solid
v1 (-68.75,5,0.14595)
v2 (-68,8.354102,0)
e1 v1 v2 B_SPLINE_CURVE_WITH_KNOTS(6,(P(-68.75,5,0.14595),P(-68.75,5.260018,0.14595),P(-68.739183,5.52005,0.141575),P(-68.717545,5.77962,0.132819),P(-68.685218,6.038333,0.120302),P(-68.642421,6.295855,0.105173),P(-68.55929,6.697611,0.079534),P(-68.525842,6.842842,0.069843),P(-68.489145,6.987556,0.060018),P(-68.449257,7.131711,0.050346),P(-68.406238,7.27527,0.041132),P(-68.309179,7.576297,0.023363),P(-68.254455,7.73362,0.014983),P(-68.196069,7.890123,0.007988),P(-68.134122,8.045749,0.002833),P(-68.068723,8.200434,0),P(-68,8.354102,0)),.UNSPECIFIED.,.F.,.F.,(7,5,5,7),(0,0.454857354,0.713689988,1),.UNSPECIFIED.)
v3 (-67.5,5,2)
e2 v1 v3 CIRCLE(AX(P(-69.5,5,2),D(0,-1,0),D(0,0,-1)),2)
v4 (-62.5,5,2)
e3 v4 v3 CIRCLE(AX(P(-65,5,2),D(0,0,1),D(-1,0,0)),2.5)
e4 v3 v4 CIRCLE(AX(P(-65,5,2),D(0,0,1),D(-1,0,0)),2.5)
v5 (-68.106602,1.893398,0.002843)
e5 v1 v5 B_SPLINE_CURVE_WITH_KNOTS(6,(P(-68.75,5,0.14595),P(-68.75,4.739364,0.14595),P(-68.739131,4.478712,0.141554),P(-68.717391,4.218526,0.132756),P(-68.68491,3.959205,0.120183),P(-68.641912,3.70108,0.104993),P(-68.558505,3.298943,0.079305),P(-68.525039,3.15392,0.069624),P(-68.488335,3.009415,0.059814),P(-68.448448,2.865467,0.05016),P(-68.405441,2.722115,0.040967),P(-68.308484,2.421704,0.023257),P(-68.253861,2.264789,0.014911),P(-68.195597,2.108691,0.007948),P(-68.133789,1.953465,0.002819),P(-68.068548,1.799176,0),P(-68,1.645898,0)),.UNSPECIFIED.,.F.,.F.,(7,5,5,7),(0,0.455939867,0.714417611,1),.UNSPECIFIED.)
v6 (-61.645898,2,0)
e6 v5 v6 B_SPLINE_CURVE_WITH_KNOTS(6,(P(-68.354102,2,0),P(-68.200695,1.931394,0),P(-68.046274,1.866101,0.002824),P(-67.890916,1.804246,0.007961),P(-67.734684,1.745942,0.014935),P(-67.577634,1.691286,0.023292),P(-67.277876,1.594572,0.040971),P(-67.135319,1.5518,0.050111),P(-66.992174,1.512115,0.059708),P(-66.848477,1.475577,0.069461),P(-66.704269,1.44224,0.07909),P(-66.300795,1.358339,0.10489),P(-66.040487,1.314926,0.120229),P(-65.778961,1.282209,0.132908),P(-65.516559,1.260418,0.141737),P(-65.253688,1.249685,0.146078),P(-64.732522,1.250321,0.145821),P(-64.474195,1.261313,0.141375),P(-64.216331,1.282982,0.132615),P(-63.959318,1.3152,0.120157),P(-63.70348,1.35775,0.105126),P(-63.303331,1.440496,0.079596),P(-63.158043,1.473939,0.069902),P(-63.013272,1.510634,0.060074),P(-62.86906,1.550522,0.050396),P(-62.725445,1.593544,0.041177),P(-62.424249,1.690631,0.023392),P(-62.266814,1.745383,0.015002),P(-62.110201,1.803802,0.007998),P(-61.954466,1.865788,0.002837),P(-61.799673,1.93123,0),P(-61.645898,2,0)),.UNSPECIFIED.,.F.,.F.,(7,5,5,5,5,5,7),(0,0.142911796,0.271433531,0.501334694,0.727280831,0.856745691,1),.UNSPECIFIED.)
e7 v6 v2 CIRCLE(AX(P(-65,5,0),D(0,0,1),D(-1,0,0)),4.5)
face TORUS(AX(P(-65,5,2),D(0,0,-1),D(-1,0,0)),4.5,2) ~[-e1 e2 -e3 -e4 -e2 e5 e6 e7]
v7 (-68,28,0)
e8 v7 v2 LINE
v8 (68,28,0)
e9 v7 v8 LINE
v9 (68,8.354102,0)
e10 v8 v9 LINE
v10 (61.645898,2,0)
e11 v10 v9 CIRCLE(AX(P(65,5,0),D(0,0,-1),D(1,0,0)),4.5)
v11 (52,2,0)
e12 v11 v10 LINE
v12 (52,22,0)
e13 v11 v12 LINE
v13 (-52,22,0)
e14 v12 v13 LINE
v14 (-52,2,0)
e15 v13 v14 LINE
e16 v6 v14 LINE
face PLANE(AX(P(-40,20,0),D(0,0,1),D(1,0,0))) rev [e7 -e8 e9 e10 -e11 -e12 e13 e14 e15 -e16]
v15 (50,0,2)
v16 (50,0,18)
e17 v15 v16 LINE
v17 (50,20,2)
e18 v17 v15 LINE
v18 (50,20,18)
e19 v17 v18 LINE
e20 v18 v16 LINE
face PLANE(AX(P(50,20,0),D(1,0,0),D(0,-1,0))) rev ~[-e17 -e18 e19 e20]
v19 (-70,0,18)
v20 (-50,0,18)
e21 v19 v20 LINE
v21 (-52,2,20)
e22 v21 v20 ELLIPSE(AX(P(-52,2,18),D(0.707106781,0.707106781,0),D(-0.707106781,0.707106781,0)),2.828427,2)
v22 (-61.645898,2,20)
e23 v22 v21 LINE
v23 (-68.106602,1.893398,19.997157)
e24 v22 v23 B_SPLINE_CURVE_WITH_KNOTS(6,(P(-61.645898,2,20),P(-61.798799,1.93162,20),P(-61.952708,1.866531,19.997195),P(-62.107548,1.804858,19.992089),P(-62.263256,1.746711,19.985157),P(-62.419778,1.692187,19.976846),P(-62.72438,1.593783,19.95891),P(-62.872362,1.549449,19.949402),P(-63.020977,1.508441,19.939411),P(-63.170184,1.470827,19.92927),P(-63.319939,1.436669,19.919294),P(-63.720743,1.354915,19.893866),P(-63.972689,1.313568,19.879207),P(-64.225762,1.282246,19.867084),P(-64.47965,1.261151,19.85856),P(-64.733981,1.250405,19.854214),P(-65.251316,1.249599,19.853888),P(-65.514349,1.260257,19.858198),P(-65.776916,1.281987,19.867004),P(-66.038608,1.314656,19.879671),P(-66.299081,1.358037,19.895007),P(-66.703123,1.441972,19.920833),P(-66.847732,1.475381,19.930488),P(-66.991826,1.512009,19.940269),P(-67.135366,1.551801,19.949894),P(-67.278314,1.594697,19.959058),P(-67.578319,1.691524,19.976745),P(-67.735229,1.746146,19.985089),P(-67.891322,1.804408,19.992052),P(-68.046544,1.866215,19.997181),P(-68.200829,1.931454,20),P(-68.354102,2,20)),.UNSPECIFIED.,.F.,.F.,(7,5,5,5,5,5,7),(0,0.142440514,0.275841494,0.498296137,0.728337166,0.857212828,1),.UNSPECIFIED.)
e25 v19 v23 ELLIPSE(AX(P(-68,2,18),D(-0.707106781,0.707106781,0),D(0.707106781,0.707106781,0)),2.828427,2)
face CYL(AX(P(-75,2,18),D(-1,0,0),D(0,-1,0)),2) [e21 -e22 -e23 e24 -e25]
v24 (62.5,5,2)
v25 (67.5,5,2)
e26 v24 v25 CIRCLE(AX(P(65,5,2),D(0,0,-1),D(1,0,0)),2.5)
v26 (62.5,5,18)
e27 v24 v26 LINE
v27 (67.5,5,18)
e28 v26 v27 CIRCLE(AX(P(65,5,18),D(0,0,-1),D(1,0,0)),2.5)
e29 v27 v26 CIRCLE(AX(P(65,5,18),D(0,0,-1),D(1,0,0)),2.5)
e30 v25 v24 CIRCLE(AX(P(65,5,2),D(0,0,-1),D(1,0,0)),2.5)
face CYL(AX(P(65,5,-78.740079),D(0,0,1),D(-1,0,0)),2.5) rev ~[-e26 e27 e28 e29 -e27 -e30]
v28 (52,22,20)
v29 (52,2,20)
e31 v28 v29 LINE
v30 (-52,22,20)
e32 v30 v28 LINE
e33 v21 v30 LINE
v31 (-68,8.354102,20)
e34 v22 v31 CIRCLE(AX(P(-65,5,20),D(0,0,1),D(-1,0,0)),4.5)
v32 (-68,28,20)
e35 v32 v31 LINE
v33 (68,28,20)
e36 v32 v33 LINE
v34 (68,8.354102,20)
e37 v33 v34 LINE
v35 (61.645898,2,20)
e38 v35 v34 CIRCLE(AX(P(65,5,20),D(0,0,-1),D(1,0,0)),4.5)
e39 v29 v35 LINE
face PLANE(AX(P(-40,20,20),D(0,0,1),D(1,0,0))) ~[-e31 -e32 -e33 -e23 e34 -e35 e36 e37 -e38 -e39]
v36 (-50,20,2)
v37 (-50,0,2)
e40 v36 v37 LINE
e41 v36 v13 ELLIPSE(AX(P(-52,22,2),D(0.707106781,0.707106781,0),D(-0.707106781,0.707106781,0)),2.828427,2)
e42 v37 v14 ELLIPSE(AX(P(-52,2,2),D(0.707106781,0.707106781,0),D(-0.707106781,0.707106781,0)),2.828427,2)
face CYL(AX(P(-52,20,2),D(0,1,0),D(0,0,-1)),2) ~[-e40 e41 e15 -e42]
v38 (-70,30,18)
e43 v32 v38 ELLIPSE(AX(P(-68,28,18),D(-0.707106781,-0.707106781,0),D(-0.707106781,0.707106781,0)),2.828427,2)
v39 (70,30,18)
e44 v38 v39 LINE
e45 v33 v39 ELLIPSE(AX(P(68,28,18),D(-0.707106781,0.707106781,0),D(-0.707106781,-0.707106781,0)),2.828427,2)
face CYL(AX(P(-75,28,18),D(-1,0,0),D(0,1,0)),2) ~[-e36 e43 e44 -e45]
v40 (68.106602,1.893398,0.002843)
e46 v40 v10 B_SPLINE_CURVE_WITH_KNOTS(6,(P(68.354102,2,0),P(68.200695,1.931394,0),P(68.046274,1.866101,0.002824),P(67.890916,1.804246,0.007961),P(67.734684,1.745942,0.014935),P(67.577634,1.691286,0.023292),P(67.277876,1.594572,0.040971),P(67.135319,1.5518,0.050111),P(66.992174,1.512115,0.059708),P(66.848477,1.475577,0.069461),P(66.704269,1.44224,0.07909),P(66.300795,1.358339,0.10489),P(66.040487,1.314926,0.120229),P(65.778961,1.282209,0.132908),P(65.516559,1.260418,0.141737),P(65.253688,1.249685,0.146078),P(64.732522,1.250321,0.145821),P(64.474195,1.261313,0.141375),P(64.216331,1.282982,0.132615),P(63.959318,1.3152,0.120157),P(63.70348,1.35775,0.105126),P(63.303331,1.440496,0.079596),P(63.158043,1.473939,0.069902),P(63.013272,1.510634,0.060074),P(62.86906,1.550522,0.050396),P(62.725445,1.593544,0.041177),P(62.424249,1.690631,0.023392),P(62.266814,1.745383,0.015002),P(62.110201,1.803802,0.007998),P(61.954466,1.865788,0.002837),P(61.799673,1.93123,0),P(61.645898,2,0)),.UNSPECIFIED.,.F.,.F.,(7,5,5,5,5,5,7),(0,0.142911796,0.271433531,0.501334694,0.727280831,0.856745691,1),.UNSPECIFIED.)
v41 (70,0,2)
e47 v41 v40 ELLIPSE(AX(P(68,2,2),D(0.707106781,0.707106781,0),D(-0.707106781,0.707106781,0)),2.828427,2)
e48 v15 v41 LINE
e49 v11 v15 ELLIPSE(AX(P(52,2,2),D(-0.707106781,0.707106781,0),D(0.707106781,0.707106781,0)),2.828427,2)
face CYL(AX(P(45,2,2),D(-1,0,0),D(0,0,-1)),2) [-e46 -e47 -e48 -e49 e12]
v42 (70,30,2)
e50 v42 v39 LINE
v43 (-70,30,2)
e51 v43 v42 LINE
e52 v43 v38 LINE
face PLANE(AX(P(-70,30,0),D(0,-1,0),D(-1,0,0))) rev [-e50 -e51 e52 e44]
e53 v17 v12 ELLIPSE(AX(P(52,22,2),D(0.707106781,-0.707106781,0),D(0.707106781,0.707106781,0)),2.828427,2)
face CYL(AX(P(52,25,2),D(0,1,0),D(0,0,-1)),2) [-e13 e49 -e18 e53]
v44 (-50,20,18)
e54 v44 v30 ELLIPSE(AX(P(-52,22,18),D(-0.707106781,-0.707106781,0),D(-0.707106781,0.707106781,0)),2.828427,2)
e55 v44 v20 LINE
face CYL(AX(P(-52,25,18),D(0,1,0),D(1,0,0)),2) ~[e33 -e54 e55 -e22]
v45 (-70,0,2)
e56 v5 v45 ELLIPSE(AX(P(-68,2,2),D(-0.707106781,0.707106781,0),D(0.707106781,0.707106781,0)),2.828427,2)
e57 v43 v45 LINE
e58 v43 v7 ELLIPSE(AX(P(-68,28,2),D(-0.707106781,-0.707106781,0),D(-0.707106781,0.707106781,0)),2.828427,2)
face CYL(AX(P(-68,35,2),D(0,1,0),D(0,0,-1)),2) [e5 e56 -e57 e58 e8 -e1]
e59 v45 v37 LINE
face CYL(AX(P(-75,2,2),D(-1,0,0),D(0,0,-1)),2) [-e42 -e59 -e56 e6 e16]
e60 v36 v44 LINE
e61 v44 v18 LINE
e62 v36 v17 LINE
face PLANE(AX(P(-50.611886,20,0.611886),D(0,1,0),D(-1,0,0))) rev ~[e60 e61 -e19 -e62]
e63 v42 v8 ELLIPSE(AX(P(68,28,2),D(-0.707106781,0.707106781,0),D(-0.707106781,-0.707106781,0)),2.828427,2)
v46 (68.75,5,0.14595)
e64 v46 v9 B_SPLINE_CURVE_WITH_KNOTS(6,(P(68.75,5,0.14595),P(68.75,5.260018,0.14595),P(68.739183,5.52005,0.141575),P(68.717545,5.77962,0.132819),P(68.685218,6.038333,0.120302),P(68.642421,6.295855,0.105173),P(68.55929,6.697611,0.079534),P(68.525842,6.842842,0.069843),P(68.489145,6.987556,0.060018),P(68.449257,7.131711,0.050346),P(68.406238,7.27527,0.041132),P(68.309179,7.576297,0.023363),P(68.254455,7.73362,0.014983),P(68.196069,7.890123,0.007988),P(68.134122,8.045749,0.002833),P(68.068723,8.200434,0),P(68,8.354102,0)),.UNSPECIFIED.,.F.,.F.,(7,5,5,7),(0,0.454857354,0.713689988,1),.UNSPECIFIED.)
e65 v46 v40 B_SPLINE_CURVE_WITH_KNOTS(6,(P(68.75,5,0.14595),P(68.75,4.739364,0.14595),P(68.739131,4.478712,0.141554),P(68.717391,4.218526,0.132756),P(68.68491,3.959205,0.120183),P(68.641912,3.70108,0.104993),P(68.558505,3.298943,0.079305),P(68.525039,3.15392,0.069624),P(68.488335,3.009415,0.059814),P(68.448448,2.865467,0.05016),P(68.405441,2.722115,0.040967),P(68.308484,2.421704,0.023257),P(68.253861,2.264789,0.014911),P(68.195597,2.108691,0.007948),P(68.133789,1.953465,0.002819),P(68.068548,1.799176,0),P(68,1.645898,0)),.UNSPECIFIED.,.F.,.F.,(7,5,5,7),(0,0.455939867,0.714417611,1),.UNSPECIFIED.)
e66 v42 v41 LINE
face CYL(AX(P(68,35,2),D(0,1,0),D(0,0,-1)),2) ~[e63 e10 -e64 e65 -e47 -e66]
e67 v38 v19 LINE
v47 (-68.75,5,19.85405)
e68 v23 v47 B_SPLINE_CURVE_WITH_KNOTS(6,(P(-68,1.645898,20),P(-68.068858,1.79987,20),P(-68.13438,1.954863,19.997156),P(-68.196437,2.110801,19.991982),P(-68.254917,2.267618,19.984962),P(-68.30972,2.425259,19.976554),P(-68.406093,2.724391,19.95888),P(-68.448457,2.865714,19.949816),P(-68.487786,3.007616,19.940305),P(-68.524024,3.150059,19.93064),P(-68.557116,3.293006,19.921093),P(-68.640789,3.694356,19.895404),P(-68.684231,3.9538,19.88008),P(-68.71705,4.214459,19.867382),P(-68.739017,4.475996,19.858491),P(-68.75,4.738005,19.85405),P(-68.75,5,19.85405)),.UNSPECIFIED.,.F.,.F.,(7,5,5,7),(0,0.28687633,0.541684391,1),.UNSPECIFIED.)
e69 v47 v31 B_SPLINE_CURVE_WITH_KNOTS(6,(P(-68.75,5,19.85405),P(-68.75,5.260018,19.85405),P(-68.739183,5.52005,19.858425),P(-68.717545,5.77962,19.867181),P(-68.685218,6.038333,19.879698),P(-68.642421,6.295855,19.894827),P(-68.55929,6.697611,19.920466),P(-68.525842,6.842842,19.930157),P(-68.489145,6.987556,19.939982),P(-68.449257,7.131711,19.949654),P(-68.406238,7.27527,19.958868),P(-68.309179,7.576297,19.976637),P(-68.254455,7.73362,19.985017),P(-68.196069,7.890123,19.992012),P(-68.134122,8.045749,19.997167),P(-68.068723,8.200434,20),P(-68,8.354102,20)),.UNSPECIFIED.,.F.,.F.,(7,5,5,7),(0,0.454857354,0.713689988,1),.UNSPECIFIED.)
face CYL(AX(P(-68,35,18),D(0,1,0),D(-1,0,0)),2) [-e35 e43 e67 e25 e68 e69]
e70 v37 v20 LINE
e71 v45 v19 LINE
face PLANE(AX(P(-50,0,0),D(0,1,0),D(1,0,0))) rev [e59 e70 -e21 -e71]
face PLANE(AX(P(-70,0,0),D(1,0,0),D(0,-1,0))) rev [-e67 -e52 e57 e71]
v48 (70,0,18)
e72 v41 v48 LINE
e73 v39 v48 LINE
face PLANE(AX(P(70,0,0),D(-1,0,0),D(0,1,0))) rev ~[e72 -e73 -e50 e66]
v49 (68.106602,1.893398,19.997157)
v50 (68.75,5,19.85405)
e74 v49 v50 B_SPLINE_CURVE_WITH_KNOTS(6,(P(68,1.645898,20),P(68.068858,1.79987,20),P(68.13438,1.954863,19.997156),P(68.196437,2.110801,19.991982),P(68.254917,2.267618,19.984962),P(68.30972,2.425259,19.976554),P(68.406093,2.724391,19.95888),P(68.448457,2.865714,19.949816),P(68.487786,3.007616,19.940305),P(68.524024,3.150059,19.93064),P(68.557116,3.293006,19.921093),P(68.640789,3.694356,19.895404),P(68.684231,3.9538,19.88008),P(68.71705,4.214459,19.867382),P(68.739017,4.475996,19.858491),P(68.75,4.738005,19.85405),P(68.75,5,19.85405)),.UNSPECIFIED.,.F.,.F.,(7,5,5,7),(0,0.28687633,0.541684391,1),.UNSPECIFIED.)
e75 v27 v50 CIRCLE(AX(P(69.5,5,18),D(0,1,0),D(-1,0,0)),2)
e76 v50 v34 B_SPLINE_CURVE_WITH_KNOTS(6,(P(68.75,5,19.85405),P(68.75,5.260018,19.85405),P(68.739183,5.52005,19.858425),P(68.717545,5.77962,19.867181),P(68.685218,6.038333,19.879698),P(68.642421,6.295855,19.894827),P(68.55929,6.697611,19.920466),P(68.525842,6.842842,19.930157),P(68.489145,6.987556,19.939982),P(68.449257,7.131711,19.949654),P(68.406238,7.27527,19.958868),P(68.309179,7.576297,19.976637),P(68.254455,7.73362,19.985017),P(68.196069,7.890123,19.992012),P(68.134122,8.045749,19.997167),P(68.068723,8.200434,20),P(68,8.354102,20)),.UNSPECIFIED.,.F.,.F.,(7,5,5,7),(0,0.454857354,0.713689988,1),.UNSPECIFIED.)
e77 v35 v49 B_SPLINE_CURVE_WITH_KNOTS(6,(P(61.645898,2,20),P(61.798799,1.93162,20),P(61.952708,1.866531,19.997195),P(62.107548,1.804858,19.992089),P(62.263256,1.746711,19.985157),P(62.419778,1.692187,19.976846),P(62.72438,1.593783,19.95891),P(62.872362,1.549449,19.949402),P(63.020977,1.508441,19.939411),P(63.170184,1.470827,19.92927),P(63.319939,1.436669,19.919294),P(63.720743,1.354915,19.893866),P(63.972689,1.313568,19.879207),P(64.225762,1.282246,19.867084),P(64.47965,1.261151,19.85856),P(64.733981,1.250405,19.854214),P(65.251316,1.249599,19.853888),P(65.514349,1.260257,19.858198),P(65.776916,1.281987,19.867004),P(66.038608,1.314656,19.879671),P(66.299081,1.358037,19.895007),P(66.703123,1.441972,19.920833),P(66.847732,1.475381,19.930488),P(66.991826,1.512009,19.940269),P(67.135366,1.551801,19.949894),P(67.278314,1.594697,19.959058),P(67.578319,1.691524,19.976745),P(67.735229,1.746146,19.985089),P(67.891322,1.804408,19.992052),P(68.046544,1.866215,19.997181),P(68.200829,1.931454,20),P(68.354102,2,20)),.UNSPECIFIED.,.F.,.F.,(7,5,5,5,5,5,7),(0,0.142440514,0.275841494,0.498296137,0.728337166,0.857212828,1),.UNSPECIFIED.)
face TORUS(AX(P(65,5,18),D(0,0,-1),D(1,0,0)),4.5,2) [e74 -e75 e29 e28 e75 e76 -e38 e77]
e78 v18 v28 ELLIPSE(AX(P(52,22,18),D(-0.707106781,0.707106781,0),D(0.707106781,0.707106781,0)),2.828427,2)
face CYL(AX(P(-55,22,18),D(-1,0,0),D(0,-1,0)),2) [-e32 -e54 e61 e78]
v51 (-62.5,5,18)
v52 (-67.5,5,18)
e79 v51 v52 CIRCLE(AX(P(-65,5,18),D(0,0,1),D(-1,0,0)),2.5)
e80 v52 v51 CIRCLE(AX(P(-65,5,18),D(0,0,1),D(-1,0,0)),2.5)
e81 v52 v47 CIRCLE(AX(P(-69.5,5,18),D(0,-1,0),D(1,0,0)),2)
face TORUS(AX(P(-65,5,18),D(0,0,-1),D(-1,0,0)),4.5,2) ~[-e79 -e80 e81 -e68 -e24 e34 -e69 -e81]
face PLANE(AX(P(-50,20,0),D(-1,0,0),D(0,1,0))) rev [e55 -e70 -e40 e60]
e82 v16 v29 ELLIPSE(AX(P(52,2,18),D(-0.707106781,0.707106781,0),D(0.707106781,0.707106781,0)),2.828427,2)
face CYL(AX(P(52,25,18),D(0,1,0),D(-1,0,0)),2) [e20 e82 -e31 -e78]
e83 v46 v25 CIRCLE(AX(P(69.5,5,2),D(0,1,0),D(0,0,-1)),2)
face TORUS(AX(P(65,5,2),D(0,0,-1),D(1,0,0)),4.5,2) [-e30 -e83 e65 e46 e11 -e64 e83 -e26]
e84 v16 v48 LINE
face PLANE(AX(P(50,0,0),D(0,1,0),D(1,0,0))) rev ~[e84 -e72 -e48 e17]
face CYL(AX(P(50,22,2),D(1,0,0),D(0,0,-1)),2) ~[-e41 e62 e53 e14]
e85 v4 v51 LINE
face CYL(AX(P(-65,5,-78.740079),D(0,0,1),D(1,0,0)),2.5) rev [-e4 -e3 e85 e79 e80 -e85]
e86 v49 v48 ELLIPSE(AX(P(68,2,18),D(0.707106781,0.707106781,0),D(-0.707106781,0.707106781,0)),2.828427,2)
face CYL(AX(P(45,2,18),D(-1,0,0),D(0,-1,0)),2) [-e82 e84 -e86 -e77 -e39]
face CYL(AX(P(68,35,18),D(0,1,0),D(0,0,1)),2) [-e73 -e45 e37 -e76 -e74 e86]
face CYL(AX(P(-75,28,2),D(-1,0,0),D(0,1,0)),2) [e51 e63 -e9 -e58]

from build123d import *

# Parameters (mm, degrees)
F1_DEPTH     = 20
F3_D         = 5
F5_T1_DEPTH  = 150
F5_T3_DEPTH  = 40
F5_T5_DEPTH  = 25
F5_T7_DEPTH  = 100
F5_T9_DEPTH  = 30
F5_T11_DEPTH = 30
F5_T25_DEPTH = 30
F5_T29_DEPTH = 105
F5_T36_DEPTH = 105
F5_T40_DEPTH = 30
F5_T47_DEPTH = 30
F5_T51_DEPTH = 105
F5_T58_DEPTH = 105
F5_T62_DEPTH = 30


# Not quite as in the source:
# - a fillet or chamfer that OpenCascade refuses, or shapes differently, is made with other operations: its cross-section is extruded or revolved along the edge and cut away or added


with BuildPart() as f1:
    # F0 (on Top) → F1 (new body)
    with BuildSketch(Plane.XY):
        Polygon((70, 30), (0, 30), (0, 20), (50, 20), (50, 0), (70, 0), align=None)
    extrude(amount=F1_DEPTH)

    # F3 (through all)
    with Locations(Plane(origin=(0, 0, 0), x_dir=(1, 0, 0), z_dir=(0, 0, -1))):
        with Locations((65, -5)):
            Hole(F3_D / 2)

    # F4: F1 across face


with BuildPart() as f1_1:
    add(f1.part)
    add(f1.part.mirror(Plane(origin=(0, 25, 10), x_dir=(0, -1, 0), z_dir=(-1, 0, 0))))

    # F5: fillet of radius 2 on 20 edges, made by hand

    # F5_s2 → F5_t1 (cut)
    with BuildSketch(Plane.YZ.offset(-75)):
        with BuildLine():
            ThreePointArc((30, 18), (29.4142135624, 19.4142135624), (28, 20))
            Line((28, 20), (30, 20))
            Line((30, 20), (30, 18))
        make_face()
        with BuildLine():
            ThreePointArc((30, 2), (29.4142135624, 0.5857864376), (28, 0))
            Line((28, 0), (30, 0))
            Line((30, 0), (30, 2))
        make_face()
    extrude(amount=F5_T1_DEPTH, mode=Mode.SUBTRACT)

    # F5_s4 → F5_t3 (cut)
    with BuildSketch(Plane.XZ.offset(-35)):
        with BuildLine():
            ThreePointArc((68, 20), (69.4142135624, 19.4142135624), (70, 18))
            Line((70, 18), (70, 20))
            Line((70, 20), (68, 20))
        make_face()
        with BuildLine():
            ThreePointArc((-70, 18), (-69.4142135624, 19.4142135624), (-68, 20))
            Line((-68, 20), (-70, 20))
            Line((-70, 20), (-70, 18))
        make_face()
        with BuildLine():
            ThreePointArc((-68, 0), (-69.4142135624, 0.5857864376), (-70, 2))
            Line((-70, 2), (-70, 0))
            Line((-70, 0), (-68, 0))
        make_face()
        with BuildLine():
            ThreePointArc((68, 0), (69.4142135624, 0.5857864376), (70, 2))
            Line((70, 2), (70, 0))
            Line((70, 0), (68, 0))
        make_face()
    extrude(amount=F5_T3_DEPTH, mode=Mode.SUBTRACT)

    # F5_s6 → F5_t5 (cut)
    with BuildSketch(Plane.XZ.offset(-20)):
        with BuildLine():
            ThreePointArc((50, 18), (50.5857864376, 19.4142135624), (52, 20))
            Line((52, 20), (50, 20))
            Line((50, 20), (50, 18))
        make_face()
        with BuildLine():
            ThreePointArc((-50, 18), (-50.5857864376, 19.4142135624), (-52, 20))
            Line((-52, 20), (-50, 20))
            Line((-50, 20), (-50, 18))
        make_face()
        with BuildLine():
            ThreePointArc((-52, 0), (-50.5857864376, 0.5857864376), (-50, 2))
            Line((-50, 2), (-50, 0))
            Line((-50, 0), (-52, 0))
        make_face()
        with BuildLine():
            ThreePointArc((52, 0), (50.5857864376, 0.5857864376), (50, 2))
            Line((50, 2), (50, 0))
            Line((50, 0), (52, 0))
        make_face()
    extrude(amount=F5_T5_DEPTH, mode=Mode.SUBTRACT)

    # F5_s8 → F5_t7 (cut)
    with BuildSketch(Plane.YZ.offset(-50)):
        with BuildLine():
            ThreePointArc((20, 18), (20.5857864376, 19.4142135624), (22, 20))
            Line((22, 20), (20, 20))
            Line((20, 20), (20, 18))
        make_face()
        with BuildLine():
            ThreePointArc((22, 0), (20.5857864376, 0.5857864376), (20, 2))
            Line((20, 2), (20, 0))
            Line((20, 0), (22, 0))
        make_face()
    extrude(amount=F5_T7_DEPTH, mode=Mode.SUBTRACT)

    # F5_s10 → F5_t9 (cut)
    with BuildSketch(Plane.YZ.offset(-75)):
        with BuildLine():
            ThreePointArc((0, 18), (0.5857864376, 19.4142135624), (2, 20))
            Line((2, 20), (0, 20))
            Line((0, 20), (0, 18))
        make_face()
        with BuildLine():
            ThreePointArc((2, 0), (0.5857864376, 0.5857864376), (0, 2))
            Line((0, 2), (0, 0))
            Line((0, 0), (2, 0))
        make_face()
    extrude(amount=F5_T9_DEPTH, mode=Mode.SUBTRACT)

    # F5_s12 → F5_t11 (cut)
    with BuildSketch(Plane.YZ.offset(45)):
        with BuildLine():
            ThreePointArc((2, 0), (0.5857864376, 0.5857864376), (0, 2))
            Line((0, 2), (0, 0))
            Line((0, 0), (2, 0))
        make_face()
        with BuildLine():
            ThreePointArc((0, 18), (0.5857864376, 19.4142135624), (2, 20))
            Line((2, 20), (0, 20))
            Line((0, 20), (0, 18))
        make_face()
    extrude(amount=F5_T11_DEPTH, mode=Mode.SUBTRACT)

    # F5_s13 → F5_t14 (revolve, cut)
    with BuildSketch(Plane.XZ.offset(-5)):
        with BuildLine():
            ThreePointArc((69.5, 0), (68.0857864376, 0.5857864376), (67.5, 2))
            Line((67.5, 2), (67.5, 0))
            Line((67.5, 0), (69.5, 0))
        make_face()
    revolve(axis=Axis((65, 5, 0), (0, 0, -1)), mode=Mode.SUBTRACT)

    # F5_s15 → F5_t16 (revolve, cut)
    with BuildSketch(Plane.XZ.offset(-5)):
        with BuildLine():
            ThreePointArc((-69.5, 0), (-68.0857864376, 0.5857864376), (-67.5, 2))
            Line((-67.5, 2), (-67.5, 0))
            Line((-67.5, 0), (-69.5, 0))
        make_face()
    revolve(axis=Axis((-65, 5, 0), (0, 0, 1)), mode=Mode.SUBTRACT)

    # F5_s17 → F5_t18 (revolve, cut)
    with BuildSketch(Plane.XZ.offset(-5)):
        with BuildLine():
            ThreePointArc((67.5, 18), (68.0857864376, 19.4142135624), (69.5, 20))
            Line((69.5, 20), (67.5, 20))
            Line((67.5, 20), (67.5, 18))
        make_face()
    revolve(axis=Axis((65, 5, 20), (0, 0, -1)), mode=Mode.SUBTRACT)

    # F5_s19 → F5_t20 (revolve, cut)
    with BuildSketch(Plane.XZ.offset(-5)):
        with BuildLine():
            ThreePointArc((-67.5, 18), (-68.0857864376, 19.4142135624), (-69.5, 20))
            Line((-69.5, 20), (-67.5, 20))
            Line((-67.5, 20), (-67.5, 18))
        make_face()
    revolve(axis=Axis((-65, 5, 20), (0, 0, 1)), mode=Mode.SUBTRACT)


with BuildPart() as f5_tool23:
    # F5_s24 → F5_t25 (new body)
    with BuildSketch(Plane.XZ.offset(-25)):
        with BuildLine():
            ThreePointArc((50, 18), (50.5857864376, 19.4142135624), (52, 20))
            Line((52, 20), (50, 20))
            Line((50, 20), (50, 18))
        make_face()
    extrude(amount=F5_T25_DEPTH)

    split(bisect_by=Plane.XZ.offset(-20), keep=Keep.BOTTOM)


with BuildPart() as f5_tool27:
    # F5_s28 → F5_t29 (new body)
    with BuildSketch(Plane.YZ.offset(-50)):
        with BuildLine():
            ThreePointArc((20, 18), (20.5857864376, 19.4142135624), (22, 20))
            Line((22, 20), (20, 20))
            Line((20, 20), (20, 18))
        make_face()
    extrude(amount=F5_T29_DEPTH)

    split(bisect_by=Plane.YZ.offset(50), keep=Keep.TOP)


with BuildPart() as f5_tool23_1:
    add(f5_tool23.part)

    # F5_t31: intersect F5_tool27
    add(f5_tool27.part, mode=Mode.INTERSECT)


with BuildPart() as f1_2:
    add(f1_1.part)

    # F5_t21: cut F5_tool23
    add(f5_tool23_1.part, mode=Mode.SUBTRACT)


with BuildPart() as f5_tool34:
    # F5_s35 → F5_t36 (new body)
    with BuildSketch(Plane.YZ.offset(-55)):
        with BuildLine():
            ThreePointArc((20, 18), (20.5857864376, 19.4142135624), (22, 20))
            Line((22, 20), (20, 20))
            Line((20, 20), (20, 18))
        make_face()
    extrude(amount=F5_T36_DEPTH)

    split(bisect_by=Plane.YZ.offset(-50), keep=Keep.BOTTOM)


with BuildPart() as f5_tool38:
    # F5_s39 → F5_t40 (new body)
    with BuildSketch(Plane.XZ.offset(-25)):
        with BuildLine():
            ThreePointArc((-50, 18), (-50.5857864376, 19.4142135624), (-52, 20))
            Line((-52, 20), (-50, 20))
            Line((-50, 20), (-50, 18))
        make_face()
    extrude(amount=F5_T40_DEPTH)

    split(bisect_by=Plane.XZ.offset(-20), keep=Keep.BOTTOM)


with BuildPart() as f5_tool34_1:
    add(f5_tool34.part)

    # F5_t42: intersect F5_tool38
    add(f5_tool38.part, mode=Mode.INTERSECT)


with BuildPart() as f1_3:
    add(f1_2.part)

    # F5_t32: cut F5_tool34
    add(f5_tool34_1.part, mode=Mode.SUBTRACT)


with BuildPart() as f5_tool45:
    # F5_s46 → F5_t47 (new body)
    with BuildSketch(Plane.XZ.offset(-25)):
        with BuildLine():
            ThreePointArc((-52, 0), (-50.5857864376, 0.5857864376), (-50, 2))
            Line((-50, 2), (-50, 0))
            Line((-50, 0), (-52, 0))
        make_face()
    extrude(amount=F5_T47_DEPTH)

    split(bisect_by=Plane.XZ.offset(-20), keep=Keep.BOTTOM)


with BuildPart() as f5_tool49:
    # F5_s50 → F5_t51 (new body)
    with BuildSketch(Plane.YZ.offset(50)):
        with BuildLine():
            ThreePointArc((22, 0), (20.5857864376, 0.5857864376), (20, 2))
            Line((20, 2), (20, 0))
            Line((20, 0), (22, 0))
        make_face()
    extrude(amount=-F5_T51_DEPTH)

    split(bisect_by=Plane.YZ.offset(-50), keep=Keep.BOTTOM)


with BuildPart() as f5_tool45_1:
    add(f5_tool45.part)

    # F5_t53: intersect F5_tool49
    add(f5_tool49.part, mode=Mode.INTERSECT)


with BuildPart() as f1_4:
    add(f1_3.part)

    # F5_t43: cut F5_tool45
    add(f5_tool45_1.part, mode=Mode.SUBTRACT)


with BuildPart() as f5_tool56:
    # F5_s57 → F5_t58 (new body)
    with BuildSketch(Plane.YZ.offset(55)):
        with BuildLine():
            ThreePointArc((22, 0), (20.5857864376, 0.5857864376), (20, 2))
            Line((20, 2), (20, 0))
            Line((20, 0), (22, 0))
        make_face()
    extrude(amount=-F5_T58_DEPTH)

    split(bisect_by=Plane.YZ.offset(50), keep=Keep.TOP)


with BuildPart() as f5_tool60:
    # F5_s61 → F5_t62 (new body)
    with BuildSketch(Plane.XZ.offset(-25)):
        with BuildLine():
            ThreePointArc((52, 0), (50.5857864376, 0.5857864376), (50, 2))
            Line((50, 2), (50, 0))
            Line((50, 0), (52, 0))
        make_face()
    extrude(amount=F5_T62_DEPTH)

    split(bisect_by=Plane.XZ.offset(-20), keep=Keep.BOTTOM)


with BuildPart() as f5_tool56_1:
    add(f5_tool56.part)

    # F5_t64: intersect F5_tool60
    add(f5_tool60.part, mode=Mode.INTERSECT)


with BuildPart() as f1_5:
    add(f1_4.part)

    # F5_t54: cut F5_tool56
    add(f5_tool56_1.part, mode=Mode.SUBTRACT)


solid = f1_5.part
